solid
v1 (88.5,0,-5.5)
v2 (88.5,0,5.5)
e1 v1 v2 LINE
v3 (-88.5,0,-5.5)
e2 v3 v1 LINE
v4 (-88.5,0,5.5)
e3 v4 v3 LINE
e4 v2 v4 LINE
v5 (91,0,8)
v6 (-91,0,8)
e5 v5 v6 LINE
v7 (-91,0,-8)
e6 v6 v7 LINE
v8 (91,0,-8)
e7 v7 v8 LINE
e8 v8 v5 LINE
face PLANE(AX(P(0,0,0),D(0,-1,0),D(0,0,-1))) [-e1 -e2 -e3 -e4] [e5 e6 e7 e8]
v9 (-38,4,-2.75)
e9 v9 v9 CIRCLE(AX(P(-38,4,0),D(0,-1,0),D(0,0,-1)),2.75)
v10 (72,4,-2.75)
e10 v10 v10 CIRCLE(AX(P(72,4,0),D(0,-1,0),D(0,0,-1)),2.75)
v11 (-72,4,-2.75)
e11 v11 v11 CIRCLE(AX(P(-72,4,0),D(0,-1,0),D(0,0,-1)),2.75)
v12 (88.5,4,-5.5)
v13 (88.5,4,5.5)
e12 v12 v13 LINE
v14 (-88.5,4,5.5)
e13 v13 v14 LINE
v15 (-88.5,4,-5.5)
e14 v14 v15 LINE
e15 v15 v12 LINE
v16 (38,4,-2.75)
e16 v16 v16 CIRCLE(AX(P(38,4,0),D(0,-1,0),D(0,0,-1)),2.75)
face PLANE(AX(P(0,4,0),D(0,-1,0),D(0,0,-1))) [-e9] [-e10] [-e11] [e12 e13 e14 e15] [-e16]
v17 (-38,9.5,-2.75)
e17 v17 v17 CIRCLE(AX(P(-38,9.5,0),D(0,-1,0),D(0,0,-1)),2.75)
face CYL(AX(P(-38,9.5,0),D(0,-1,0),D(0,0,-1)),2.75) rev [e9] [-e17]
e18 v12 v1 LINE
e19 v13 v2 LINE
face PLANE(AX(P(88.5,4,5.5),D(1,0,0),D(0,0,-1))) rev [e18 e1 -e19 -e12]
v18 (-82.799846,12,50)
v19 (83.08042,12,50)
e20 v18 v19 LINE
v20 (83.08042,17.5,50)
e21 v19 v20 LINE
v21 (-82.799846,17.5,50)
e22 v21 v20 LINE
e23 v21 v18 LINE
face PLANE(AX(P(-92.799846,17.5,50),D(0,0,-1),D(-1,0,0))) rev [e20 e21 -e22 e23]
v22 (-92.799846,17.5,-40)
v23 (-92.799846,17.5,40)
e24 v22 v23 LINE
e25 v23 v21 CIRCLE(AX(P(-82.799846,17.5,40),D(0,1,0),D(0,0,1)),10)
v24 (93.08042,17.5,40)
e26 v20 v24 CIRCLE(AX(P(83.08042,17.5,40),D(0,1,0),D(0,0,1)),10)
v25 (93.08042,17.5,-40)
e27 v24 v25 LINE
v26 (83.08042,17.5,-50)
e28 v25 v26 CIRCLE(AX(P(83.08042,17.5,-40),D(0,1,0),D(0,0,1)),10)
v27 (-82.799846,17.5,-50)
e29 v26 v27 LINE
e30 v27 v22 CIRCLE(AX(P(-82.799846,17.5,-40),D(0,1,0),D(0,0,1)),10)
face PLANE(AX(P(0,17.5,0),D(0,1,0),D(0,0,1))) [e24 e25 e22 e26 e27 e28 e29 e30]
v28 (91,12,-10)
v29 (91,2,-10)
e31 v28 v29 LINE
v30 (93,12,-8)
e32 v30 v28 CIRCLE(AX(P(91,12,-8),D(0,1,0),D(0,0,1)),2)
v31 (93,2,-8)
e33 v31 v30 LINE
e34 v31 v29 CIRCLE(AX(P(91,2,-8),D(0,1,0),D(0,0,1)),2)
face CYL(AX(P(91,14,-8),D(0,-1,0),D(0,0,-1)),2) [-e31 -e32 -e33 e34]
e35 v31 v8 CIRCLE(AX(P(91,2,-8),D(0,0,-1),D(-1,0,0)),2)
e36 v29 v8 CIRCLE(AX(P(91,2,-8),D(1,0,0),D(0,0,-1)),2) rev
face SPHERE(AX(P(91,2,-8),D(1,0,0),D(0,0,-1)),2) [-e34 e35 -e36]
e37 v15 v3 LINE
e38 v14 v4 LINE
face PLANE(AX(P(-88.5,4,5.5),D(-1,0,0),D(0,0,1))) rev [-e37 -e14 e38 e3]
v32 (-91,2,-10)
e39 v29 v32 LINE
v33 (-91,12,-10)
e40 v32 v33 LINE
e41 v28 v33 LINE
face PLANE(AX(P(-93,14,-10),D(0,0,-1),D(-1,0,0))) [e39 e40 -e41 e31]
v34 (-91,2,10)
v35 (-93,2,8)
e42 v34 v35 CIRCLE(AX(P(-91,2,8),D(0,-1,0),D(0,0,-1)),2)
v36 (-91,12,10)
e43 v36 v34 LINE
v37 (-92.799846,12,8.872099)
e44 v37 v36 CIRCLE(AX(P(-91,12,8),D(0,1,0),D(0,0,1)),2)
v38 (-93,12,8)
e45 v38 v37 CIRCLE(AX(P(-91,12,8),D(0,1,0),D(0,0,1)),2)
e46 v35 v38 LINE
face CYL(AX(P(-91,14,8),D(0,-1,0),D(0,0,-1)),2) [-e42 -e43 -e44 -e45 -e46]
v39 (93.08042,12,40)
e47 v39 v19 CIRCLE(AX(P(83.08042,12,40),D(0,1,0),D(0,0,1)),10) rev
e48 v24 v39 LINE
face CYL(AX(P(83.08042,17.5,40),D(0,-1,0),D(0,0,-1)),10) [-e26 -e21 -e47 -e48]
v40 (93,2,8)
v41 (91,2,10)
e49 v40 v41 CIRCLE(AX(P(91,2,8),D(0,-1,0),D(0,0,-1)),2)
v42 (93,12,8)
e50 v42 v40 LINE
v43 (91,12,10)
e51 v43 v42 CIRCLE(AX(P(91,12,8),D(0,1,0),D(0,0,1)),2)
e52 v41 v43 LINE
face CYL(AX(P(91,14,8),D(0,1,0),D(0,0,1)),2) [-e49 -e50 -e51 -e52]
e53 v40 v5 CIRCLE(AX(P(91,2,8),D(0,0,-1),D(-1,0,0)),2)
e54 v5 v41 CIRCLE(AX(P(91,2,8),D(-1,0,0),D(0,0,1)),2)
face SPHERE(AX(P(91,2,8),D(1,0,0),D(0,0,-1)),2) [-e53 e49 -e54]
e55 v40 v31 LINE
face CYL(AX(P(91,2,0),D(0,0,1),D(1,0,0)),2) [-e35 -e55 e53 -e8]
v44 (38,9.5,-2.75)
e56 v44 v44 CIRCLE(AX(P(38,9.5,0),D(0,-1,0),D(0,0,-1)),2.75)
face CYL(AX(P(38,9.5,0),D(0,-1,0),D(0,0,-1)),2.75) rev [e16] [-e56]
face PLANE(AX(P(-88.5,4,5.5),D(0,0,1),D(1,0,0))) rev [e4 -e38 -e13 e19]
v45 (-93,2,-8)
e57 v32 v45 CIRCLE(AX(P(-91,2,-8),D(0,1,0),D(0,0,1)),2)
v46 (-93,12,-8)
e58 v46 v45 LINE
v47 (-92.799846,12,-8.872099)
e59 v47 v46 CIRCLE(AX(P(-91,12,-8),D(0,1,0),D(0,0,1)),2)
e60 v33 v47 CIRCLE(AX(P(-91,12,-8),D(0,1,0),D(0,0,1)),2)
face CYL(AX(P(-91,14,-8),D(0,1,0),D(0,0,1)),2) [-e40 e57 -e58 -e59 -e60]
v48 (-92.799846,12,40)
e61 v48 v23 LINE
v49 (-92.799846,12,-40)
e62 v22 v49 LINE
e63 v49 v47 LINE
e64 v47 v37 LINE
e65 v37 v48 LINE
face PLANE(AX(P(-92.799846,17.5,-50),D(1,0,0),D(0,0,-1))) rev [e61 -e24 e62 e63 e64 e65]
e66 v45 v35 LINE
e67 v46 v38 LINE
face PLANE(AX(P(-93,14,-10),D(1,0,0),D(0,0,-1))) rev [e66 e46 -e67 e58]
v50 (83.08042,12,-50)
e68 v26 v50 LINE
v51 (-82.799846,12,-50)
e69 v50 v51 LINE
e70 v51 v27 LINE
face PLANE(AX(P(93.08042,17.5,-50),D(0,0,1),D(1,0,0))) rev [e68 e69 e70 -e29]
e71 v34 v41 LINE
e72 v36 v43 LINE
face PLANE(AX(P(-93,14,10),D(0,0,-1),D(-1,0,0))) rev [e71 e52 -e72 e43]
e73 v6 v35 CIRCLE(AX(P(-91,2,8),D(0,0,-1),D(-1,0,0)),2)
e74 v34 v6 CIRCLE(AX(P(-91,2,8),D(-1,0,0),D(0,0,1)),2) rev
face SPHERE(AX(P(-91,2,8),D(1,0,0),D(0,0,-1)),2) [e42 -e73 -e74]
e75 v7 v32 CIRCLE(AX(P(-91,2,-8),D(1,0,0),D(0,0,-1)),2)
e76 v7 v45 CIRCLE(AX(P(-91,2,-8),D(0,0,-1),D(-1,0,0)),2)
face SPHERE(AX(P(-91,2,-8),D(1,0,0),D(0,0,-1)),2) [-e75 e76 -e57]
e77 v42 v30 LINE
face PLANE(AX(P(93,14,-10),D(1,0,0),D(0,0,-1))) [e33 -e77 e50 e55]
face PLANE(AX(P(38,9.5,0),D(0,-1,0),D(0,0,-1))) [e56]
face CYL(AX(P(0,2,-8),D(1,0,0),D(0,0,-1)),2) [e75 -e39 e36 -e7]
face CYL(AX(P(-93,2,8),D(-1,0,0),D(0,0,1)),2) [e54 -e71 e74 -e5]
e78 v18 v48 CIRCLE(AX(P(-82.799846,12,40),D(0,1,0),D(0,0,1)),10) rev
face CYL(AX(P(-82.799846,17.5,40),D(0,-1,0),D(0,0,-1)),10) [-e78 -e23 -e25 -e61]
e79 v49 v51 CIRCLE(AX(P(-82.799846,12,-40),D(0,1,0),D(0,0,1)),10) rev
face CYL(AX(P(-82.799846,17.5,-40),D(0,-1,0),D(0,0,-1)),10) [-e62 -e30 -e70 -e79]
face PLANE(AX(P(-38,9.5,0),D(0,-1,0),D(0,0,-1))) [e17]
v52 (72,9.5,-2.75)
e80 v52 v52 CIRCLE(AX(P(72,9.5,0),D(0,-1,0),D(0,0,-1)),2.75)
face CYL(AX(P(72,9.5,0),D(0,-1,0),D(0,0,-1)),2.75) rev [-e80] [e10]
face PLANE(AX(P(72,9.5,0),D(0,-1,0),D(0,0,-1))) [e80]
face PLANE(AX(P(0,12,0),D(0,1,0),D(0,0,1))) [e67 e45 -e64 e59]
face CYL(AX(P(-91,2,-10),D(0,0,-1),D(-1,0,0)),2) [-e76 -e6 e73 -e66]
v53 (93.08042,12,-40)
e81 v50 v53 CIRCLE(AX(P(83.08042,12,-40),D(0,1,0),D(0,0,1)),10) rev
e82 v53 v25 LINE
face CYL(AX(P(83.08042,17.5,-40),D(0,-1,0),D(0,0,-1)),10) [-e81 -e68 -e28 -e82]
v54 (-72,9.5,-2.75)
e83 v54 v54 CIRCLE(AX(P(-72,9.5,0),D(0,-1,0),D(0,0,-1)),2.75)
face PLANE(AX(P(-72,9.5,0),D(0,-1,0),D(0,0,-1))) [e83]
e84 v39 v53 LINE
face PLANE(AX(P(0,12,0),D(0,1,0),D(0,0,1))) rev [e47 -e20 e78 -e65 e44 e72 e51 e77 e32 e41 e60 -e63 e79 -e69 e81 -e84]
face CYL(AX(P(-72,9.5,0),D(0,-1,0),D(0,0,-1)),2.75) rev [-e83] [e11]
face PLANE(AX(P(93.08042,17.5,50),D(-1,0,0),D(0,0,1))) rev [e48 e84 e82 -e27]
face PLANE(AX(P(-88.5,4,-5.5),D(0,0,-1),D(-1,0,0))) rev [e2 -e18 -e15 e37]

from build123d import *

# Parameters (mm, degrees)
SKETCH_1_W          = 186
SKETCH_1_H          = 20
EXTRUDE_1_DEPTH     = 14
SKETCH_2_W          = 186
SKETCH_2_H          = 20
CUT_EXTRUDE_2_DEPTH = 2
SKETCH_3_W          = 177
SKETCH_3_H          = 11
CUT_EXTRUDE_3_DEPTH = 4
SKETCH_4_R          = 2.75
CUT_EXTRUDE_6_DEPTH = 5.5
SKETCH_5_W          = 185.880265185
SKETCH_5_H          = 100
EXTRUDE_2_DEPTH     = 5.5
FILLET_1_R          = 10
FILLET_2_R          = 10
FILLET_3_R          = 10
FILLET_4_R          = 10
FILLET_6_R          = 2
FILLET_7_R          = 2
FILLET_8_R          = 2
FILLET_9_R          = 2


with BuildPart() as part:
    # 草图1 → 凸台-拉伸1 (new body)
    with BuildSketch(Plane(origin=(0, 0, 0), x_dir=(1, 0, 0), z_dir=(0, 1, 0))):
        Rectangle(SKETCH_1_W, SKETCH_1_H)
    extrude(amount=EXTRUDE_1_DEPTH)

    # 草图2 → 切除-拉伸2 (cut)
    with BuildSketch(Plane(origin=(0, 14, 0), x_dir=(1, 0, 0), z_dir=(0, 1, 0))):
        Rectangle(SKETCH_2_W, SKETCH_2_H)
    extrude(amount=-CUT_EXTRUDE_2_DEPTH, mode=Mode.SUBTRACT)

    # 草图3 → 切除-拉伸3 (cut)
    with BuildSketch(Plane.XZ):
        Rectangle(SKETCH_3_W, SKETCH_3_H)
    extrude(amount=-CUT_EXTRUDE_3_DEPTH, mode=Mode.SUBTRACT)

    # 草图4 → 切除-拉伸6 (cut)
    with BuildSketch(Plane.XZ.offset(-4)):
        with Locations(Location((-72, 0, 0), (0, 0, 270))):
            Circle(SKETCH_4_R)
        with Locations(Location((-38, 0, 0), (0, 0, 270))):
            Circle(SKETCH_4_R)
        with Locations(Location((38, 0, 0), (0, 0, 270))):
            Circle(SKETCH_4_R)
        with Locations(Location((72, 0, 0), (0, 0, 270))):
            Circle(SKETCH_4_R)
    extrude(amount=-CUT_EXTRUDE_6_DEPTH, mode=Mode.SUBTRACT)

    # 草图5 → 凸台-拉伸2 (add)
    with BuildSketch(Plane(origin=(0, 12, 0), x_dir=(1, 0, 0), z_dir=(0, 1, 0))):
        with Locations((0.140286992, 0)):
            Rectangle(SKETCH_5_W, SKETCH_5_H)
    extrude(amount=EXTRUDE_2_DEPTH)

    # 圆角1
    fillet_1_edges = [part.edges().sort_by_distance(p)[0] for p in [
        (-92.7998456, 14.75, 50),
    ]]
    fillet(fillet_1_edges, radius=FILLET_1_R)

    # 圆角2
    fillet_2_edges = [part.edges().sort_by_distance(p)[0] for p in [
        (93.080419585, 14.75, 50),
    ]]
    fillet(fillet_2_edges, radius=FILLET_2_R)

    # 圆角3
    fillet_3_edges = [part.edges().sort_by_distance(p)[0] for p in [
        (93.080419585, 14.75, -50),
    ]]
    fillet(fillet_3_edges, radius=FILLET_3_R)

    # 圆角4
    fillet_4_edges = [part.edges().sort_by_distance(p)[0] for p in [
        (-92.7998456, 14.75, -50),
    ]]
    fillet(fillet_4_edges, radius=FILLET_4_R)

    # 圆角6
    fillet_6_edges = [part.edges().sort_by_distance(p)[0] for p in [
        (0, 0, -10),
    ]]
    fillet(fillet_6_edges, radius=FILLET_6_R)

    # 圆角7
    fillet_7_edges = [part.edges().sort_by_distance(p)[0] for p in [
        (0, 0, 10),
    ]]
    fillet(fillet_7_edges, radius=FILLET_7_R)

    # 圆角8
    # the kernel refuses this fillet: 2 mm, written as the material it takes off along each edge
    with BuildSketch(Plane(origin=(-93, 0, 8), x_dir=(1, 0, 0), z_dir=(0, 0, -1))) as fillet_8_piece_1:
        with BuildLine():
            CenterArc((FILLET_8_R, -FILLET_8_R), FILLET_8_R, 90, 90)
            Line((0, -FILLET_8_R), (0, 0))
            Line((0, 0), (FILLET_8_R, 0))
        make_face()
    extrude(amount=16, mode=Mode.SUBTRACT)
    with BuildSketch(Plane(origin=(-93, 2, -8), x_dir=(0, 0, -1), z_dir=(0, 1, 0))) as fillet_8_piece_2:
        with BuildLine():
            CenterArc((2 - FILLET_8_R, -FILLET_8_R), FILLET_8_R, 0, 90)
            Line((2 - FILLET_8_R, 0), (2, 0))
            Line((2, 0), (2, -FILLET_8_R))
        make_face()
    revolve(axis=Axis((-93, 2, -8), (-1, 0, 0)), revolution_arc=90, mode=Mode.SUBTRACT)
    with BuildSketch(Plane(origin=(-93, 2, 8), x_dir=(0, -1, 0), z_dir=(0, 0, -1))) as fillet_8_piece_3:
        with BuildLine():
            CenterArc((2 - FILLET_8_R, -FILLET_8_R), FILLET_8_R, 0, 90)
            Line((2 - FILLET_8_R, 0), (2, 0))
            Line((2, 0), (2, -FILLET_8_R))
        make_face()
    revolve(axis=Axis((-93, 2, 8), (-1, 0, 0)), revolution_arc=90, mode=Mode.SUBTRACT)
    with BuildSketch(Plane(origin=(-93, 2, 10), x_dir=(1, 0, 0), z_dir=(0, 1, 0))) as fillet_8_piece_4:
        with BuildLine():
            CenterArc((FILLET_8_R, FILLET_8_R), FILLET_8_R, 180, 90)
            Line((0, FILLET_8_R), (0, 0))
            Line((0, 0), (FILLET_8_R, 0))
        make_face()
    extrude(amount=10, mode=Mode.SUBTRACT)
    with BuildSketch(Plane(origin=(-93, 2, -10), x_dir=(1, 0, 0), z_dir=(0, 1, 0))) as fillet_8_piece_5:
        with BuildLine():
            CenterArc((FILLET_8_R, -FILLET_8_R), FILLET_8_R, 90, 90)
            Line((0, -FILLET_8_R), (0, 0))
            Line((0, 0), (FILLET_8_R, 0))
        make_face()
    extrude(amount=10, mode=Mode.SUBTRACT)

    # 圆角9
    fillet_9_edges = [part.edges().sort_by_distance(p)[0] for p in [
        (93, 0, 0),
        (93, 0.585786438, -9.414213562),
        (93, 0.585786438, 9.414213562),
        (93, 7, -10),
        (93, 7, 10),
    ]]
    fillet(fillet_9_edges, radius=FILLET_9_R)


solid = part.part
